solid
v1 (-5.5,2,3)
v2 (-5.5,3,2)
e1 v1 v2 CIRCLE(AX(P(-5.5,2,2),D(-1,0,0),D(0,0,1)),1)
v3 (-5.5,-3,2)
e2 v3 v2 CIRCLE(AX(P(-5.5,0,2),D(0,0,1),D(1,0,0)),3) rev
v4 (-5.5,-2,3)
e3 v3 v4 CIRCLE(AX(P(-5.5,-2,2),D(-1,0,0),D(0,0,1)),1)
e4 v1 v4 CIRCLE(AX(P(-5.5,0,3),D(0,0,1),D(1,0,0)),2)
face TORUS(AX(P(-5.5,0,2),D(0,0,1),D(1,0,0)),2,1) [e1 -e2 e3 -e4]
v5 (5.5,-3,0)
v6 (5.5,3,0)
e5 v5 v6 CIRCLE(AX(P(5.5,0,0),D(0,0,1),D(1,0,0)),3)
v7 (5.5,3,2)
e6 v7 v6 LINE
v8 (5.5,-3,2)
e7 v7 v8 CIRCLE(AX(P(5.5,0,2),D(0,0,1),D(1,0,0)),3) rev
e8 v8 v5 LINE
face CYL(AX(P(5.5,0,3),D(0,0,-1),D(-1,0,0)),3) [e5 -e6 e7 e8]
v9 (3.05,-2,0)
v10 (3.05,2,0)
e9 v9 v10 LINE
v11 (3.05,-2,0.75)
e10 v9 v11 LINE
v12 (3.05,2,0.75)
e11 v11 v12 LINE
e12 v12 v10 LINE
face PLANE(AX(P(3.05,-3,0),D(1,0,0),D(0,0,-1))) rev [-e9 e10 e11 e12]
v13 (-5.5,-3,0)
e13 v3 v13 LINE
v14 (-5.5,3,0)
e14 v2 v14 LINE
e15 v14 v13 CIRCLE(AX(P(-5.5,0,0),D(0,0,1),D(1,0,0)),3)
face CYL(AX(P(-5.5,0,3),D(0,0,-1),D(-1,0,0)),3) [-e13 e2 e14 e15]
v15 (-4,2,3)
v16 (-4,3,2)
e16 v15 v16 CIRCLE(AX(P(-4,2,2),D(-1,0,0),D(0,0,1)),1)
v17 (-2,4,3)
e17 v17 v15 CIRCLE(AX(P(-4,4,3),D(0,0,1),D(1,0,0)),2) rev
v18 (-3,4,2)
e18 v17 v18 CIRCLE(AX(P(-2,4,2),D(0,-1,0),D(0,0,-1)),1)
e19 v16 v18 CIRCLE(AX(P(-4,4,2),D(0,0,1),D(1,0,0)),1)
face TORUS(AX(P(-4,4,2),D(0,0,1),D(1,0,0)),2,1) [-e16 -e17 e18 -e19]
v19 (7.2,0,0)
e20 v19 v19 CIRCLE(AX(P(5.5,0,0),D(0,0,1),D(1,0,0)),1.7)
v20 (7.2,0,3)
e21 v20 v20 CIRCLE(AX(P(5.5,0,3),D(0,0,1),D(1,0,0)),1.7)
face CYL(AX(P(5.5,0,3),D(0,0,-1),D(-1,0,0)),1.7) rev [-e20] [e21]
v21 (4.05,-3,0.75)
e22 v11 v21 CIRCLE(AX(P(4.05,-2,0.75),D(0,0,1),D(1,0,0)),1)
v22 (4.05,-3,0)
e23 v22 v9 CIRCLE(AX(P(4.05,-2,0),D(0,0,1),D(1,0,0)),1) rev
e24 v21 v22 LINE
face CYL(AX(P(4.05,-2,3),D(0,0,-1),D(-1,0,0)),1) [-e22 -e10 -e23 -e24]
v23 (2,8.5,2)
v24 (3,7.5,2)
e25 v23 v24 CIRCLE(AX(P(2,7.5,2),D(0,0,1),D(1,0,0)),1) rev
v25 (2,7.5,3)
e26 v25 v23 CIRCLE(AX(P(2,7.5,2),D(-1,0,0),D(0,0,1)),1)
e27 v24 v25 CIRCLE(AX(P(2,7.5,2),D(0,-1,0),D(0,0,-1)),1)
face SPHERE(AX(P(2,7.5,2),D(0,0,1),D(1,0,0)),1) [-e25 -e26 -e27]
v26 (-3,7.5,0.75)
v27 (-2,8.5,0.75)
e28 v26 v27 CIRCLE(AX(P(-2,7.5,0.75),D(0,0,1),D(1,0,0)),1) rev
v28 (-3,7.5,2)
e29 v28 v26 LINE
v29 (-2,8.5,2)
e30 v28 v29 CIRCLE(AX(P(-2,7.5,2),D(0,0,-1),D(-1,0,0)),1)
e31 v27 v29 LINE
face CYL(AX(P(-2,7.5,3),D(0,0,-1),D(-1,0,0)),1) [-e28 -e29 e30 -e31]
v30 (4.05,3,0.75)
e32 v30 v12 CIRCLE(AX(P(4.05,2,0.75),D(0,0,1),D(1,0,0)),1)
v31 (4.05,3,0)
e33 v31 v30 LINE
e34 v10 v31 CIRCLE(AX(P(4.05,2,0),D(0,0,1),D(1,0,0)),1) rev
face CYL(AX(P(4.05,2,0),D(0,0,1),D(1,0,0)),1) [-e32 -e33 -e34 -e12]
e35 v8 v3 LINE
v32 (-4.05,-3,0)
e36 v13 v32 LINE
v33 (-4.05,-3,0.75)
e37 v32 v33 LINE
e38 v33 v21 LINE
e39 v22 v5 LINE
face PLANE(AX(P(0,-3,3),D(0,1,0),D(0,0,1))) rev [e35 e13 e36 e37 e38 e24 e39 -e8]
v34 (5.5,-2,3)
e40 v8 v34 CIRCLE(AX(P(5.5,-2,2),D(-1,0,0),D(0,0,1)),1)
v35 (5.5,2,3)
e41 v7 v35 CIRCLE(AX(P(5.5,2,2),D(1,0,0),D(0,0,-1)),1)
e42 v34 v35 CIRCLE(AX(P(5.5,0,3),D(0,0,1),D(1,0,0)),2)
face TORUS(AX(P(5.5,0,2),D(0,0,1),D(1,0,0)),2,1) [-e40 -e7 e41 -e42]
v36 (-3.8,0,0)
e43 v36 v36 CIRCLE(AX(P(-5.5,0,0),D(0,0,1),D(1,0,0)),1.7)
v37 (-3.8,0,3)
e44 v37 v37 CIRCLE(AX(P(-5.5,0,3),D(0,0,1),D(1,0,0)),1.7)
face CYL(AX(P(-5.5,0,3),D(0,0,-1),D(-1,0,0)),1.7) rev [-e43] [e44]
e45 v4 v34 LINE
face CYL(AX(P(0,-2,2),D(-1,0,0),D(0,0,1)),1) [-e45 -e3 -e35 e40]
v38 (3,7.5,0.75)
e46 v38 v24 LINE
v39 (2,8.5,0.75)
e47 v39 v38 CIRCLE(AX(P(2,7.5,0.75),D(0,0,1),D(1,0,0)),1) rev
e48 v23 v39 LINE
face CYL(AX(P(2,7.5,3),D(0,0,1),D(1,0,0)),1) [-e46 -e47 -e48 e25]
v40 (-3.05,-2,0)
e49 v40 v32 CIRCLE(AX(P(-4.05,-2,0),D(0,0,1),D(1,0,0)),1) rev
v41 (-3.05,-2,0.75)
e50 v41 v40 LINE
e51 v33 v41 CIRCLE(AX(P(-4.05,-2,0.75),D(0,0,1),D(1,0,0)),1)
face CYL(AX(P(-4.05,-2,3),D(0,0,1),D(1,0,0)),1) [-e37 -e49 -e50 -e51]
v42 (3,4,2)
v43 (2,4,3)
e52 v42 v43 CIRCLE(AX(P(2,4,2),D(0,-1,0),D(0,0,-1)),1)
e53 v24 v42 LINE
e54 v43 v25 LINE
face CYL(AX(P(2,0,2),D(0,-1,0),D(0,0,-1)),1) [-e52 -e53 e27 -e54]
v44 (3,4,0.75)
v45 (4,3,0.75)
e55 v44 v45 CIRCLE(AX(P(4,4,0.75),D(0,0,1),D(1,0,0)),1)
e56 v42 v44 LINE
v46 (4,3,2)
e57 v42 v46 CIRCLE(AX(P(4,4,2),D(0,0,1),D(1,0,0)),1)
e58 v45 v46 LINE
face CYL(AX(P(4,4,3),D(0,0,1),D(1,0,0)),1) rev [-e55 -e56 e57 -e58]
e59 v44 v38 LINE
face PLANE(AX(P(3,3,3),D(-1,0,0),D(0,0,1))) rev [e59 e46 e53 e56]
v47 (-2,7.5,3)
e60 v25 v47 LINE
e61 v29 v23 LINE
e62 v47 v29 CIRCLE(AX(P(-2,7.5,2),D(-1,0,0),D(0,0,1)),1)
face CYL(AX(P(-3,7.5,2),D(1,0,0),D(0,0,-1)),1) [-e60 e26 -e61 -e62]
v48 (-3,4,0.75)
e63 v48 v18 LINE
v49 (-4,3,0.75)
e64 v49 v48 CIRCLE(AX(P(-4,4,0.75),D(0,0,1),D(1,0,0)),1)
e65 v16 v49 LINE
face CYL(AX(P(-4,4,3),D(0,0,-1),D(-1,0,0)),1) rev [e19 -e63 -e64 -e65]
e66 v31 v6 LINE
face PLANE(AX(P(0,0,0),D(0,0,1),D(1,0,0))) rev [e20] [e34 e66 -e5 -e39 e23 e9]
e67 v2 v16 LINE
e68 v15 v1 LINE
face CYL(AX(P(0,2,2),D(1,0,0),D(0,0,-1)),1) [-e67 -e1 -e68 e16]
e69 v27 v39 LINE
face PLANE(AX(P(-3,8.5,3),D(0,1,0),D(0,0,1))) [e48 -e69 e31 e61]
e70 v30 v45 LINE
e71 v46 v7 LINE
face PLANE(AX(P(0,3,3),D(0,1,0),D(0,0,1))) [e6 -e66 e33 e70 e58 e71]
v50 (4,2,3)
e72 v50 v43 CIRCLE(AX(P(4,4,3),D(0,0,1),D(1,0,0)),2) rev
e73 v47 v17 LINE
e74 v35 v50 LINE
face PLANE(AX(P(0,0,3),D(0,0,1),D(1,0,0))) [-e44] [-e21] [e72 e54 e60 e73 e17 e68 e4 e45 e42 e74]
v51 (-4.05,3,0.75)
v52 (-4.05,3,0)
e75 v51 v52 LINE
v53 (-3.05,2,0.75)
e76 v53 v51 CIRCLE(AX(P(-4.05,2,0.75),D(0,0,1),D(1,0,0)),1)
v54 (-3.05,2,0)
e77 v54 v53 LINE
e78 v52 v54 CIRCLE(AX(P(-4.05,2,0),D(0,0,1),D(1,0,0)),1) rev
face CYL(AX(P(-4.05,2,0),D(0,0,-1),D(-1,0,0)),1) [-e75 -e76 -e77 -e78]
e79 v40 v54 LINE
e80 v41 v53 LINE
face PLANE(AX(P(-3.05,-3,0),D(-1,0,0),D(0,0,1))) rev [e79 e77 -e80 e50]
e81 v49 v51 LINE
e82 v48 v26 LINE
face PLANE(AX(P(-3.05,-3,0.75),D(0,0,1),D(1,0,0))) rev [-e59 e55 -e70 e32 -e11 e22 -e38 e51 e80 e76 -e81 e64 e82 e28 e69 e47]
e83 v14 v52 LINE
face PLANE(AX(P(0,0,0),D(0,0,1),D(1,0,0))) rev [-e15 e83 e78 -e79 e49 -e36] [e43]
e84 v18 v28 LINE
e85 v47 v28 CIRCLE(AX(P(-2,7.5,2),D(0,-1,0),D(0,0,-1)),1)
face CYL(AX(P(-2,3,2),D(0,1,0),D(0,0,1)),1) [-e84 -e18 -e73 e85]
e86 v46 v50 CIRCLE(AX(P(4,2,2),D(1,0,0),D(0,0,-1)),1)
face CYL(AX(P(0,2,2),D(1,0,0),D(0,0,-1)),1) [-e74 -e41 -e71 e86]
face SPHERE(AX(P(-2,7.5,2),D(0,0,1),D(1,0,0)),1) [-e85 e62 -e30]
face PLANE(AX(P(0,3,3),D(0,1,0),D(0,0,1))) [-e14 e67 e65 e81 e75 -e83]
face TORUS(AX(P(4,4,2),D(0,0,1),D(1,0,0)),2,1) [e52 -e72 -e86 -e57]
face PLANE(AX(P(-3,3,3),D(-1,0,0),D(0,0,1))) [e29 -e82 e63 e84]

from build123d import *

# Parameters (mm, degrees)
SKETCH1_R               = 1.7
SKETCH1_W               = 6
SKETCH1_H               = 5.5
BOSS_EXTRUDE1_DEPTH     = 3
CUT_EXTRUDE1_DEPTH      = 13.389511693
CUT_EXTRUDE1_DEPTH_BACK = 13.389511693
SKETCH2_W               = 6.1
SKETCH2_H               = 0.75
FILLET2_R               = 1
FILLET1_R               = 1


with BuildPart() as part:
    # Sketch1 → Boss-Extrude1 (new body)
    # profile 1 of 2: a face of its own
    with BuildSketch(Plane.XY):
        with BuildLine():
            Line((-5.5, 3), (5.5, 3))
            ThreePointArc((5.5, 3), (8.5, 0), (5.5, -3))
            Line((5.5, -3), (-5.5, -3))
            ThreePointArc((-5.5, -3), (-8.5, 0), (-5.5, 3))
        make_face()
        with Locations((5.5, 0)):
            Circle(SKETCH1_R, mode=Mode.SUBTRACT)
        with Locations((-5.5, 0)):
            Circle(SKETCH1_R, mode=Mode.SUBTRACT)
    # profile 2 of 2: a face of its own
    with BuildSketch(Plane.XY):
        with Locations((0, 5.75)):
            Rectangle(SKETCH1_W, SKETCH1_H)
    extrude(amount=BOSS_EXTRUDE1_DEPTH)

    # Sketch2 → Cut-Extrude1 (cut, two sides: drawn at the far end of the back side and taken through both)
    with BuildSketch(Plane(origin=(0, 0, 0), x_dir=(1, 0, 0), z_dir=(0, 1, 0)).offset(-CUT_EXTRUDE1_DEPTH_BACK)):
        with Locations((0, -0.375)):
            Rectangle(SKETCH2_W, SKETCH2_H)
    extrude(amount=CUT_EXTRUDE1_DEPTH + CUT_EXTRUDE1_DEPTH_BACK, mode=Mode.SUBTRACT)

    # Fillet2
    fillet2_edges = [part.edges().sort_by_distance(p)[0] for p in [
        (3, 3, 1.875),
        (-3, 3, 1.875),
        (3, 8.5, 1.875),
        (-3, 8.5, 1.875),
    ]]
    fillet(fillet2_edges, radius=FILLET2_R)

    # Fillet1
    # the kernel refuses this fillet: 1 mm, written as the material it takes off along each edge
    with BuildSketch(Plane(origin=(-5.5, 0, 3), x_dir=(0, -1, 0), z_dir=(1, 0, 0))) as fillet1_piece_1:
        with BuildLine():
            CenterArc((3 - FILLET1_R, FILLET1_R), FILLET1_R, 270, 90)
            Line((3, FILLET1_R), (3, 0))
            Line((3, 0), (3 - FILLET1_R, 0))
        make_face()
    revolve(axis=Axis((-5.5, 0, 3), (0, 0, -1)), revolution_arc=180, mode=Mode.SUBTRACT)
    with BuildSketch(Plane(origin=(5.5, -3, 3), x_dir=(0, 0, -1), z_dir=(-1, 0, 0))) as fillet1_piece_2:
        with BuildLine():
            CenterArc((FILLET1_R, -FILLET1_R), FILLET1_R, 90, 90)
            Line((0, -FILLET1_R), (0, 0))
            Line((0, 0), (FILLET1_R, 0))
        make_face()
    extrude(amount=11, mode=Mode.SUBTRACT)
    with BuildSketch(Plane(origin=(5.5, 0, 3), x_dir=(0, 1, 0), z_dir=(-1, 0, 0))) as fillet1_piece_3:
        with BuildLine():
            CenterArc((3 - FILLET1_R, FILLET1_R), FILLET1_R, 270, 90)
            Line((3 - FILLET1_R, 0), (3, 0))
            Line((3, 0), (3, FILLET1_R))
        make_face()
    revolve(axis=Axis((5.5, 0, 3), (0, 0, -1)), revolution_arc=180, mode=Mode.SUBTRACT)
    with BuildSketch(Plane(origin=(3.05, -3, -2.5), x_dir=(0, 1, 0), z_dir=(0, 0, 1))) as fillet1_piece_4:
        with BuildLine():
            CenterArc((FILLET1_R, -FILLET1_R), FILLET1_R, 90, 90)
            Line((0, -FILLET1_R), (0, 0))
            Line((0, 0), (FILLET1_R, 0))
        make_face()
    extrude(amount=3.25, mode=Mode.SUBTRACT)
    with BuildSketch(Plane(origin=(-3.05, -3, 0.75), x_dir=(-1, 0, 0), z_dir=(0, 0, -1))) as fillet1_piece_5:
        with BuildLine():
            CenterArc((FILLET1_R, FILLET1_R), FILLET1_R, 180, 90)
            Line((0, FILLET1_R), (0, 0))
            Line((0, 0), (FILLET1_R, 0))
        make_face()
    extrude(amount=3.25, mode=Mode.SUBTRACT)
    with BuildSketch(Plane(origin=(-5.5, 3, 3), x_dir=(0, -1, 0), z_dir=(1, 0, 0))) as fillet1_piece_6:
        with BuildLine():
            CenterArc((FILLET1_R, FILLET1_R), FILLET1_R, 180, 90)
            Line((0, FILLET1_R), (0, 0))
            Line((0, 0), (FILLET1_R, 0))
        make_face()
    extrude(amount=1.5, mode=Mode.SUBTRACT)
    with BuildSketch(Plane(origin=(4, 3, 3), x_dir=(0, 0, -1), z_dir=(1, 0, 0))) as fillet1_piece_7:
        with BuildLine():
            CenterArc((FILLET1_R, -FILLET1_R), FILLET1_R, 90, 90)
            Line((0, -FILLET1_R), (0, 0))
            Line((0, 0), (FILLET1_R, 0))
        make_face()
    extrude(amount=1.5, mode=Mode.SUBTRACT)
    with BuildSketch(Plane(origin=(4, 4, 3), x_dir=(0, -1, 0), z_dir=(1, 0, 0))) as fillet1_piece_8:
        with BuildLine():
            CenterArc((1 + FILLET1_R, FILLET1_R), FILLET1_R, 180, 90)
            Line((1 + FILLET1_R, 0), (1, 0))
            Line((1, 0), (1, FILLET1_R))
        make_face()
    revolve(axis=Axis((4, 4, 3), (0, 0, -1)), revolution_arc=90, mode=Mode.SUBTRACT)
    with BuildSketch(Plane(origin=(3, 4, 3), x_dir=(-1, 0, 0), z_dir=(0, 1, 0)), Plane(origin=(-3, 7.5, 3), x_dir=(1, 0, 0), z_dir=(0, -1, 0))) as fillet1_piece_9:
        with BuildLine():
            CenterArc((FILLET1_R, -FILLET1_R), FILLET1_R, 90, 90)
            Line((0, -FILLET1_R), (0, 0))
            Line((0, 0), (FILLET1_R, 0))
        make_face()
    extrude(amount=3.5, mode=Mode.SUBTRACT)
    with BuildSketch(Plane(origin=(2, 7.5, 3), x_dir=(0, 1, 0), z_dir=(-1, 0, 0))) as fillet1_piece_10:
        with BuildLine():
            CenterArc((1 - FILLET1_R, FILLET1_R), FILLET1_R, 270, 90)
            Line((1, FILLET1_R), (1, 0))
            Line((1, 0), (1 - FILLET1_R, 0))
        make_face()
    revolve(axis=Axis((2, 7.5, 3), (0, 0, -1)), revolution_arc=90, mode=Mode.SUBTRACT)
    with BuildSketch(Plane(origin=(2, 8.5, 3), x_dir=(0, -1, 0), z_dir=(-1, 0, 0))) as fillet1_piece_11:
        with BuildLine():
            CenterArc((FILLET1_R, -FILLET1_R), FILLET1_R, 90, 90)
            Line((0, -FILLET1_R), (0, 0))
            Line((0, 0), (FILLET1_R, 0))
        make_face()
    extrude(amount=4, mode=Mode.SUBTRACT)
    with BuildSketch(Plane(origin=(-2, 7.5, 3), x_dir=(-1, 0, 0), z_dir=(0, -1, 0))) as fillet1_piece_12:
        with BuildLine():
            CenterArc((1 - FILLET1_R, FILLET1_R), FILLET1_R, 270, 90)
            Line((1, FILLET1_R), (1, 0))
            Line((1, 0), (1 - FILLET1_R, 0))
        make_face()
    revolve(axis=Axis((-2, 7.5, 3), (0, 0, -1)), revolution_arc=90, mode=Mode.SUBTRACT)
    with BuildSketch(Plane(origin=(-4, 4, 3), x_dir=(0, -1, 0), z_dir=(-1, 0, 0))) as fillet1_piece_13:
        with BuildLine():
            CenterArc((1 + FILLET1_R, -FILLET1_R), FILLET1_R, 90, 90)
            Line((1, -FILLET1_R), (1, 0))
            Line((1, 0), (1 + FILLET1_R, 0))
        make_face()
    revolve(axis=Axis((-4, 4, 3), (0, 0, 1)), revolution_arc=90, mode=Mode.SUBTRACT)
    with BuildSketch(Plane(origin=(-3.05, 3.6877501, -4.21937525), x_dir=(0, -1, 0), z_dir=(0, 0, 1))) as fillet1_piece_14:
        with BuildLine():
            CenterArc((1.6877501, -1), FILLET1_R, 90, 90)
            Line((0.6877501, -1), (0.5877501, -1))
            ThreePointArc((0.5877501, -1), (0.5877501, -0.95), (-0.03122499, -0.095))
            Line((-0.03122499, -0.095), (0, 0.1))
            Line((0, 0.1), (1.6877501, 0.1))
            Line((1.6877501, 0.1), (1.6877501, 0))
        make_face()
    extrude(amount=4.96937525, mode=Mode.SUBTRACT)
    with BuildSketch(Plane(origin=(3.05, 3.6877501, -4.21937525), x_dir=(0.8239457103973873, -0.5666687447863566, 0), z_dir=(0, 0, 1))) as fillet1_piece_15:
        with BuildLine():
            CenterArc((1.780340941, -0.82394571), FILLET1_R, 124.51825235, 90)
            Line((0.956395231, -1.390614455), (0.87400066, -1.44728133))
            Line((0.87400066, -1.44728133), (-0.082394571, -0.056666874))
            Line((-0.082394571, -0.056666874), (0.060580617, 0.079561227))
            ThreePointArc((0.060580617, 0.079561227), (1.115808036, 0.054061134), (1.157005322, 0.082394571))
            Line((1.157005322, 0.082394571), (1.213672196, 0))
        make_face()
    extrude(amount=4.96937525, mode=Mode.SUBTRACT)


solid = part.part
